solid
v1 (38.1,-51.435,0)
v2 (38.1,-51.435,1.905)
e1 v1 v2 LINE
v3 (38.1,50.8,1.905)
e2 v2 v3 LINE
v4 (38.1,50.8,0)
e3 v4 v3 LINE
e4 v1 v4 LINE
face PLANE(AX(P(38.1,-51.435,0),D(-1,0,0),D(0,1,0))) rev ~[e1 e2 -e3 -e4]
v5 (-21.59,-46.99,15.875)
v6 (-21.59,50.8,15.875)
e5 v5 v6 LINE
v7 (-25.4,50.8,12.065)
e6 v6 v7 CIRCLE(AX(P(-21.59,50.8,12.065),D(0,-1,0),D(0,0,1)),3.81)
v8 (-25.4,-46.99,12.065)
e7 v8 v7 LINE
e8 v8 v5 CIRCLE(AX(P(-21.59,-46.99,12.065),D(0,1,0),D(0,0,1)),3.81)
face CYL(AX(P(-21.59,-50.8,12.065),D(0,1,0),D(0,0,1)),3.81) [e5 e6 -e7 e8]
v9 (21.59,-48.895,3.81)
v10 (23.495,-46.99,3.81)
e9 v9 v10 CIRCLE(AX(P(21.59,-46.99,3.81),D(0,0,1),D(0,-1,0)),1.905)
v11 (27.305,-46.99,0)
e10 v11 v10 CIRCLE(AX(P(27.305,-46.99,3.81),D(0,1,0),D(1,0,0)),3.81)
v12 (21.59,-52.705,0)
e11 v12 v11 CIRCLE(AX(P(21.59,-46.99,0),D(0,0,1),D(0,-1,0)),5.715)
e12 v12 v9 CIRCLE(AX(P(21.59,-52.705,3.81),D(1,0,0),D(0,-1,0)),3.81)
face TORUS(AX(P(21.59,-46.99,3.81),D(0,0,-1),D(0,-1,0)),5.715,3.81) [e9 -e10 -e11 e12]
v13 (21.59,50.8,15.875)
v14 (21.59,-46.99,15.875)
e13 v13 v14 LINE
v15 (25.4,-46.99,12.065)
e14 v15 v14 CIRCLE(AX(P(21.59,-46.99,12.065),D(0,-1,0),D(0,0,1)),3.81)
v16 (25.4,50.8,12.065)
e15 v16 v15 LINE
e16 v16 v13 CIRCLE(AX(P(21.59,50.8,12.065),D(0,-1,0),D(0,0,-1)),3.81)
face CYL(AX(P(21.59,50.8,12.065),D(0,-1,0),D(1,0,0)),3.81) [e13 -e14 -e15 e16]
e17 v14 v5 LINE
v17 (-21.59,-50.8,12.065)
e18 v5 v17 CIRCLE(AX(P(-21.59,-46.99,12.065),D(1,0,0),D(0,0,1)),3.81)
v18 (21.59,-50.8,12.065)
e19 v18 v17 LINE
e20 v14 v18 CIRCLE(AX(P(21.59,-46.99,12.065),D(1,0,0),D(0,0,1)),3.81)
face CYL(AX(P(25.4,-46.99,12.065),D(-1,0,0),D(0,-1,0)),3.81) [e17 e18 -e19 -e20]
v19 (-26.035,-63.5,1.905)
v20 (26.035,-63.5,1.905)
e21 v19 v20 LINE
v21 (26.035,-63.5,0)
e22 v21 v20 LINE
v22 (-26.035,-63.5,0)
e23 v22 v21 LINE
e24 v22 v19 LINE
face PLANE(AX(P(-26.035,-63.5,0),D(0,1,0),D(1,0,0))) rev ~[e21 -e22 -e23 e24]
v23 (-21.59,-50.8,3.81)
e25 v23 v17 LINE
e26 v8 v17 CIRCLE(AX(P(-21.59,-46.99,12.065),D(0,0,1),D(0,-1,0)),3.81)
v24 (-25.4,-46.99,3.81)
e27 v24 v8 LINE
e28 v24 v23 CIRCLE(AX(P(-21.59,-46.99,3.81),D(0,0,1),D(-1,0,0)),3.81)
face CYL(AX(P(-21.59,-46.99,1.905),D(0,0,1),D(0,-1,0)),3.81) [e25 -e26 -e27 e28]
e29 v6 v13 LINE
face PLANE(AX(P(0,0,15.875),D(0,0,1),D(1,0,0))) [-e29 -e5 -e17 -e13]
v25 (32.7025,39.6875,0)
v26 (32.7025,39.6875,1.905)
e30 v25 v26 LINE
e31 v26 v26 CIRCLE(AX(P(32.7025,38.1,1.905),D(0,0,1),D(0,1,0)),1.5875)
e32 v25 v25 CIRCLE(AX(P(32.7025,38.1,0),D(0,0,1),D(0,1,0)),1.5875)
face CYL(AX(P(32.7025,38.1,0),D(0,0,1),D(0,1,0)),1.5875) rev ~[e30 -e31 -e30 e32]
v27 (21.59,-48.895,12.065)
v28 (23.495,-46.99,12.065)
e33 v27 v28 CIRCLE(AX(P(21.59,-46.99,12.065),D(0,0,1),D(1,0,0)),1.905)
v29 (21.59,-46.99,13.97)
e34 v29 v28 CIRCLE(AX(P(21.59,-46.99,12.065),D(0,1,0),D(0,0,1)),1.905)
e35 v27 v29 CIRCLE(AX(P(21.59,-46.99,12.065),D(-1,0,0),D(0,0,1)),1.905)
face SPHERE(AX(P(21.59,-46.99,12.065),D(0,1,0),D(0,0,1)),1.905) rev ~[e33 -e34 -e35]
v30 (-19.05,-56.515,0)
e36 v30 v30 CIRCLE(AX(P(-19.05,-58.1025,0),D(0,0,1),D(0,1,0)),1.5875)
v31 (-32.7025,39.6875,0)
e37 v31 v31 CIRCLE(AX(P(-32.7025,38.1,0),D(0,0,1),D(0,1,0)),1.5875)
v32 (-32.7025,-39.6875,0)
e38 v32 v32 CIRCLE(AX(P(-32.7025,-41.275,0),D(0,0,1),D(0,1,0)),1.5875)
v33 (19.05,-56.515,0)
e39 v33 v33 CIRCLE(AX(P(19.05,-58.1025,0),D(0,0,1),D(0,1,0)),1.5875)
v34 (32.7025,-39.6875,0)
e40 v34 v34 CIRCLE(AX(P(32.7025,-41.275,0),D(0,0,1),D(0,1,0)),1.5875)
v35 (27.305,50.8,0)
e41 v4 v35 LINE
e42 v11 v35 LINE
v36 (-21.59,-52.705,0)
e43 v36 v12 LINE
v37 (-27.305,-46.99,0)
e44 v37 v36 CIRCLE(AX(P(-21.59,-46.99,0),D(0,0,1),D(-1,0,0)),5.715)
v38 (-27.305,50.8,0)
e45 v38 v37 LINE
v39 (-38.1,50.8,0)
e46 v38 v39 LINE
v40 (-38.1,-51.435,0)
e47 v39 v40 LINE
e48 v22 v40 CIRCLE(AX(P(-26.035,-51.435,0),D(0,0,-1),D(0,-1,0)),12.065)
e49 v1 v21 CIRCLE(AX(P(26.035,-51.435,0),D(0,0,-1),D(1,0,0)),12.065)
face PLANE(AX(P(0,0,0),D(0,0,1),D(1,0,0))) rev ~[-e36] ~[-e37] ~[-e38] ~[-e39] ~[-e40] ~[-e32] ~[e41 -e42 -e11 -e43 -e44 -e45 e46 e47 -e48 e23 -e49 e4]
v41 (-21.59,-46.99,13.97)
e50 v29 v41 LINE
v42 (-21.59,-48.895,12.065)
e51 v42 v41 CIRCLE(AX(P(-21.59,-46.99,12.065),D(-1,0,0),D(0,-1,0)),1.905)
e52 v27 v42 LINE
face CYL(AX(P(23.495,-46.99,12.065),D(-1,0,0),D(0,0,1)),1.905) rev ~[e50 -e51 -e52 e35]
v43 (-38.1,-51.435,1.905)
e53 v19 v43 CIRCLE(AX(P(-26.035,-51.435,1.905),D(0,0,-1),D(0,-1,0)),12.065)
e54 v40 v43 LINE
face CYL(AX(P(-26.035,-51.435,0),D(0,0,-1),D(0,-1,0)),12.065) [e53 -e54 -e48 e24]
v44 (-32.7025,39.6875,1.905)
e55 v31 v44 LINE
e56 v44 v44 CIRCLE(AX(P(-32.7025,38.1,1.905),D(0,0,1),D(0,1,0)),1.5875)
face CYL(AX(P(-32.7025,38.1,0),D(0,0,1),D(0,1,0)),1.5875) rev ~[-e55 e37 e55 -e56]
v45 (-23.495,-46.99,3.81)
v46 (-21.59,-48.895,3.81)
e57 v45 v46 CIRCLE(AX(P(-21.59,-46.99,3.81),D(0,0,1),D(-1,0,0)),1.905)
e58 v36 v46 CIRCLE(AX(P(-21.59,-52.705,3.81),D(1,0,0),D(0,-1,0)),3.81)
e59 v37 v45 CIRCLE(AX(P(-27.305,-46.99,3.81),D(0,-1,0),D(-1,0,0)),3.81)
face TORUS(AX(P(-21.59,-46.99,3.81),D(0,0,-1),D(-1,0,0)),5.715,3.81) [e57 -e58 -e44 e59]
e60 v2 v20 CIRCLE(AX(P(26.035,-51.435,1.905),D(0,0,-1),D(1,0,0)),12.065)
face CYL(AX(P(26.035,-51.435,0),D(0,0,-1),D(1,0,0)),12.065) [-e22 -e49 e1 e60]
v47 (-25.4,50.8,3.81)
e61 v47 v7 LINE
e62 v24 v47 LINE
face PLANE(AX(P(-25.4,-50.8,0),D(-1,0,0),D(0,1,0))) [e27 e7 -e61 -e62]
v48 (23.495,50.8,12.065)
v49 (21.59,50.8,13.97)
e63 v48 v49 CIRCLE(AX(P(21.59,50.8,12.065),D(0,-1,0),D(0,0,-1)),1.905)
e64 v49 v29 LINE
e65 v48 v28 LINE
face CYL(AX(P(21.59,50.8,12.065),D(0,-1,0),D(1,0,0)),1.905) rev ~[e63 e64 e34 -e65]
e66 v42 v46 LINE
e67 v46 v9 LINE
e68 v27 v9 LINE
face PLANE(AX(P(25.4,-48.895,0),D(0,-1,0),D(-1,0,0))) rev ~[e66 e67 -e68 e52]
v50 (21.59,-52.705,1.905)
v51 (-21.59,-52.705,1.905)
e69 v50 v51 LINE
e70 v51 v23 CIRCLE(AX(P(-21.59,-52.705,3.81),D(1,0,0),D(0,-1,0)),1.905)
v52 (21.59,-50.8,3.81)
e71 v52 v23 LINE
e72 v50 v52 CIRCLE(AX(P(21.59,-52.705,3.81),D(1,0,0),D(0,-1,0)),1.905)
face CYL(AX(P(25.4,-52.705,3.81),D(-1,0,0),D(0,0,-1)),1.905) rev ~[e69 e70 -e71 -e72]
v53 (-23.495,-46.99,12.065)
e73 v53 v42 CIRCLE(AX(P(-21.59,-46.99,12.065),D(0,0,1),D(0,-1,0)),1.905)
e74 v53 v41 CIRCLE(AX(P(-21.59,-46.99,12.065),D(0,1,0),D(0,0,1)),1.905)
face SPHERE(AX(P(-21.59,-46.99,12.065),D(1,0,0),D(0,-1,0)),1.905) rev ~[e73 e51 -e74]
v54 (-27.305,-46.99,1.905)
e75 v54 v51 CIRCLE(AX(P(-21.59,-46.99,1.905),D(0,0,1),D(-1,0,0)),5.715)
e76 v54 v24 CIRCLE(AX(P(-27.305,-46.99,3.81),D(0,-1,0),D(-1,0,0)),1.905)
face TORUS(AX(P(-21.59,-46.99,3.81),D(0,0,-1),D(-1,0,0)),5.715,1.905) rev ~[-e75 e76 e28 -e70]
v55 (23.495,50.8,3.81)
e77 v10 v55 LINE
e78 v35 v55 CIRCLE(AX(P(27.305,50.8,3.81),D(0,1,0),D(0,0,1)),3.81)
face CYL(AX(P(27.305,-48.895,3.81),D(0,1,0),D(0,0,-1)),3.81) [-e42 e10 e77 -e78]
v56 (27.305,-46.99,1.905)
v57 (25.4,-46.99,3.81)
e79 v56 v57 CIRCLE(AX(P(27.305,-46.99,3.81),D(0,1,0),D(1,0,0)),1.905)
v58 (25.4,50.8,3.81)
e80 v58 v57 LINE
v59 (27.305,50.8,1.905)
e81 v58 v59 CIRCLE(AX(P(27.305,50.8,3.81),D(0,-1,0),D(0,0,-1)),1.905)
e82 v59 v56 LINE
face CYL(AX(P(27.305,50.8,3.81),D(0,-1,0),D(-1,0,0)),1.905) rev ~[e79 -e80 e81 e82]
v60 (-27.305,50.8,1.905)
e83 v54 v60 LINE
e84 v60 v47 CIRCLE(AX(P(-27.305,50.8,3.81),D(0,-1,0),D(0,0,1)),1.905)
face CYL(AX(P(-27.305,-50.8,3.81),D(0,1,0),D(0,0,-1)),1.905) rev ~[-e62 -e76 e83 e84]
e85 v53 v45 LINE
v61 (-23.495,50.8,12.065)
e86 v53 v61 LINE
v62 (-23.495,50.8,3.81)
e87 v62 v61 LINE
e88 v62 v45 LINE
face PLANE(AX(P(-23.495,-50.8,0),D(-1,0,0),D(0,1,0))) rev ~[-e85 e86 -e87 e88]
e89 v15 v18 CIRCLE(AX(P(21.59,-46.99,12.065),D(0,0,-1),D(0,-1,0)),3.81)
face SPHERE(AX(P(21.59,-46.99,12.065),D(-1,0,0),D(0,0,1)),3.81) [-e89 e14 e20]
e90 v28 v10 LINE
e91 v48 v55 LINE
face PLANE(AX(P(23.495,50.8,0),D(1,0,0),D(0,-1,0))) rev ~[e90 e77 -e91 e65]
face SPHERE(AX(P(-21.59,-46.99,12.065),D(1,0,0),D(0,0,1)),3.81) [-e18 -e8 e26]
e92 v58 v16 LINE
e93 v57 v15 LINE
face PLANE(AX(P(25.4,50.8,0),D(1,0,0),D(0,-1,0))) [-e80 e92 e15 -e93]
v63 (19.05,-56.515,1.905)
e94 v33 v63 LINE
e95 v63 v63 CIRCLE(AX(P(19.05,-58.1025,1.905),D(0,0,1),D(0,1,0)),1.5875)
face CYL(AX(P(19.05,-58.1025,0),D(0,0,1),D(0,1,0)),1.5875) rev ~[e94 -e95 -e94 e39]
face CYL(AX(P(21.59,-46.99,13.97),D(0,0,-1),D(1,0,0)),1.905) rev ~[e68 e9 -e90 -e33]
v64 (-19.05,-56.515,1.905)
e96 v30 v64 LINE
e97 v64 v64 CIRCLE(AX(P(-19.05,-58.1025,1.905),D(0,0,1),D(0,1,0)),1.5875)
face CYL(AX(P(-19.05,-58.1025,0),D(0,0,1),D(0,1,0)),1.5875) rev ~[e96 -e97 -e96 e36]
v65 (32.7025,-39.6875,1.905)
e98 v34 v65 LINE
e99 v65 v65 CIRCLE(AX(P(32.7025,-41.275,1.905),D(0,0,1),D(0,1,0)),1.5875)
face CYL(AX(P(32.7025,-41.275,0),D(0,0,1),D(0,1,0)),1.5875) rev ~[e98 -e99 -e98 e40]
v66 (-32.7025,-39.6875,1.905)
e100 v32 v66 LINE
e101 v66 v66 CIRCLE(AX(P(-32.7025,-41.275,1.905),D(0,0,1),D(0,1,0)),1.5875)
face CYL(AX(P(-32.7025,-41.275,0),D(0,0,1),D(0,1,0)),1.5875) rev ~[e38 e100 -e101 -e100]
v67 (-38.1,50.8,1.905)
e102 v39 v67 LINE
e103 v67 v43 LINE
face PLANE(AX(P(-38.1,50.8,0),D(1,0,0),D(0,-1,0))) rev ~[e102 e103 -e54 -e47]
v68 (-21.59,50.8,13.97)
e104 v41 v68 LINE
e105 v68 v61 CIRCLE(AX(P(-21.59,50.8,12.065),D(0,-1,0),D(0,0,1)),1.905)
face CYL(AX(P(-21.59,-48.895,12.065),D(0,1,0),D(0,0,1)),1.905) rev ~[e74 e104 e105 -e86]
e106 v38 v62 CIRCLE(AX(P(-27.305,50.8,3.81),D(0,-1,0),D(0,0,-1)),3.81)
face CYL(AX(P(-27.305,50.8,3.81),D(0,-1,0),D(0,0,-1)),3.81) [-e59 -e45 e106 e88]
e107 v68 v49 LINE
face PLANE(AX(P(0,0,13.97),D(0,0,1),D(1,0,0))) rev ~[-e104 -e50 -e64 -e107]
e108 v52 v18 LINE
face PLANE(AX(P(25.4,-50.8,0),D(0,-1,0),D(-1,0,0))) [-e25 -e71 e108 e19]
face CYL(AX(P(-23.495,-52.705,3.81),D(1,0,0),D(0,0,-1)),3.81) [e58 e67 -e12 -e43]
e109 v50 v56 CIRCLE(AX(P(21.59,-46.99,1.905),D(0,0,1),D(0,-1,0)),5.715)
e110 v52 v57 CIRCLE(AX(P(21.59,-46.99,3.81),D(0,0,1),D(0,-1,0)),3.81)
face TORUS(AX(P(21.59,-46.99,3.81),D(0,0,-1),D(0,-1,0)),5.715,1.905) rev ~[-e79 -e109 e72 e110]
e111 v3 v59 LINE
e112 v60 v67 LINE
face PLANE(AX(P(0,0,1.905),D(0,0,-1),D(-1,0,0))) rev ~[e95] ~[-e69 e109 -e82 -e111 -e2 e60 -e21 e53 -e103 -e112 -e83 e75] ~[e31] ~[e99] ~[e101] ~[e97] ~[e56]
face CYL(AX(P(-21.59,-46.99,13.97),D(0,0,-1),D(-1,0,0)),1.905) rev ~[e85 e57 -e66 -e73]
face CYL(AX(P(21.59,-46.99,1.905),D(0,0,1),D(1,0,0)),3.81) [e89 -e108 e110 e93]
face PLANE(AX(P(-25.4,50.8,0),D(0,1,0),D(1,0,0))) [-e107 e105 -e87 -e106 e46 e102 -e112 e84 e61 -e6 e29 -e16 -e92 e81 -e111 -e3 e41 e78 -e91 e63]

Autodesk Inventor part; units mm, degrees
ref_plane "YZ Plane" through (0, 0, 0) normal (1, 0, 0) x (0, 1, 0)
ref_plane "XZ Plane" through (0, 0, 0) normal (0, 1, 0) x (-1, 0, 0)
ref_plane "XY Plane" through (0, 0, 0) normal (0, 0, 1) x (1, 0, 0)
sketch "Sketch1" plane through (0, 0, 0) normal (0, 0, 1) x (1, 0, 0)
  line L0 (-25.4, 50.8) -> (25.4, 50.8)
  line L1 (25.4, 50.8) -> (25.4, -50.8)
  line L2 (25.4, -50.8) -> (-25.4, -50.8)
  line L3 (-25.4, -50.8) -> (-25.4, 50.8)
  point P0 (0, 0)
  point P1 (0, 50.8)
  point P2 (-25.4, 0)
  dimension "Width" = 50.8
  dimension "Height" = 101.6
extrude "Extrusion1" add sketch "Sketch1" along normal blind 15.875
shell "Shell1" thickness 1.905 removed faces 2 at (-8.4667, 50.8, 5.2917) at (-8.4667, 16.9333, 0)
sketch "Sketch2" plane through (0, 0, 0) normal (0, 0, -1) x (-1, 0, 0)
  line L0 (-25.4, 50.8) -> (-25.4, -50.8) projected
  line L1 (25.4, -50.8) -> (25.4, 50.8) projected
  line L2 (-25.4, -50.8) -> (25.4, -50.8) projected
  line L3 (25.4, 50.8) -> (38.1, 50.8)
  line L4 (38.1, 50.8) -> (38.1, -51.435)
  arc A0 (26.035, -63.5) -> (38.1, -51.435) centre (26.035, -51.435) ccw
  line L5 (26.035, -63.5) -> (-26.035, -63.5)
  arc A1 (-38.1, -51.435) -> (-26.035, -63.5) centre (-26.035, -51.435) ccw
  line L6 (-38.1, -51.435) -> (-38.1, 50.8)
  line L7 (-38.1, 50.8) -> (-25.4, 50.8)
  dimension "d5" = 12.7
  dimension "d6" = 12.7
  dimension "d7" = 12.065
extrude "Extrusion2" add sketch "Sketch2" against normal blind 1.905
fillet "Fillet1" radius 1.905 8 edges at (23.495, 0.9525, 13.97) (0, -48.895, 13.97) (23.495, -48.895, 6.985) (-23.495, -48.895, 6.985) (-23.495, 0.9525, 13.97) (-25.4, 0, 1.905) (0, -50.8, 1.905) (25.4, 0, 1.905)
fillet "Fillet1" radius 3.81 8 edges at (0, -50.8, 15.875) (25.4, 0, 15.875) (-25.4, 0, 15.875) (-25.4, -50.8, 8.89) (25.4, -50.8, 8.89) (-23.495, 0.9525, 0) (0, -48.895, 0) (23.495, 0.9525, 0)
sketch "Sketch3" plane through (0, 0, 0) normal (0, 0, -1) x (-1, 0, 0)
  line L0 (-27.305, 50.8) -> (-38.1, 50.8) projected
  arc A0 (-38.1, -51.435) -> (-26.035, -63.5) centre (-26.035, -51.435) ccw projected
  line L1 (-38.1, -51.435) -> (-38.1, 50.8) projected
  line L2 (26.035, -63.5) -> (-26.035, -63.5) projected
  line L3 (0, -63.5) -> (0, -52.705) construction
  line L4 (-21.59, -52.705) -> (21.59, -52.705) construction
  line L5 (0, -89.3585) -> (0, 74.1597) construction
  point P0 (-32.7025, 38.1)
  point P1 (-32.7025, -41.275)
  point P2 (-19.05, -58.1025)
  point P3 (-32.7025, 50.8)
  point P4 (-32.7025, 50.8)
  point P5 (0, -58.1025)
  point P6 (32.7025, 38.1)
  point P7 (32.7025, -41.275)
  point P8 (19.05, -58.1025)
  dimension "d13" = 19.05
  dimension "d14" = 22.225
  dimension "d15" = 12.7
hole "Hole1" at (32.7025, 38.1, 0) at (32.7025, -41.275, 0) at (19.05, -58.1025, 0) at (-32.7025, 38.1, 0) at (-32.7025, -41.275, 0) at (-19.05, -58.1025, 0) direction (0, 0, 1) diameter 3.175 end through all clearance for "Flat Head Machine Screw (82)" size "#4" standard "Ansi Unified Screw Threads"
properties part number "M178-4001-03" material "Plastic, Clear"
